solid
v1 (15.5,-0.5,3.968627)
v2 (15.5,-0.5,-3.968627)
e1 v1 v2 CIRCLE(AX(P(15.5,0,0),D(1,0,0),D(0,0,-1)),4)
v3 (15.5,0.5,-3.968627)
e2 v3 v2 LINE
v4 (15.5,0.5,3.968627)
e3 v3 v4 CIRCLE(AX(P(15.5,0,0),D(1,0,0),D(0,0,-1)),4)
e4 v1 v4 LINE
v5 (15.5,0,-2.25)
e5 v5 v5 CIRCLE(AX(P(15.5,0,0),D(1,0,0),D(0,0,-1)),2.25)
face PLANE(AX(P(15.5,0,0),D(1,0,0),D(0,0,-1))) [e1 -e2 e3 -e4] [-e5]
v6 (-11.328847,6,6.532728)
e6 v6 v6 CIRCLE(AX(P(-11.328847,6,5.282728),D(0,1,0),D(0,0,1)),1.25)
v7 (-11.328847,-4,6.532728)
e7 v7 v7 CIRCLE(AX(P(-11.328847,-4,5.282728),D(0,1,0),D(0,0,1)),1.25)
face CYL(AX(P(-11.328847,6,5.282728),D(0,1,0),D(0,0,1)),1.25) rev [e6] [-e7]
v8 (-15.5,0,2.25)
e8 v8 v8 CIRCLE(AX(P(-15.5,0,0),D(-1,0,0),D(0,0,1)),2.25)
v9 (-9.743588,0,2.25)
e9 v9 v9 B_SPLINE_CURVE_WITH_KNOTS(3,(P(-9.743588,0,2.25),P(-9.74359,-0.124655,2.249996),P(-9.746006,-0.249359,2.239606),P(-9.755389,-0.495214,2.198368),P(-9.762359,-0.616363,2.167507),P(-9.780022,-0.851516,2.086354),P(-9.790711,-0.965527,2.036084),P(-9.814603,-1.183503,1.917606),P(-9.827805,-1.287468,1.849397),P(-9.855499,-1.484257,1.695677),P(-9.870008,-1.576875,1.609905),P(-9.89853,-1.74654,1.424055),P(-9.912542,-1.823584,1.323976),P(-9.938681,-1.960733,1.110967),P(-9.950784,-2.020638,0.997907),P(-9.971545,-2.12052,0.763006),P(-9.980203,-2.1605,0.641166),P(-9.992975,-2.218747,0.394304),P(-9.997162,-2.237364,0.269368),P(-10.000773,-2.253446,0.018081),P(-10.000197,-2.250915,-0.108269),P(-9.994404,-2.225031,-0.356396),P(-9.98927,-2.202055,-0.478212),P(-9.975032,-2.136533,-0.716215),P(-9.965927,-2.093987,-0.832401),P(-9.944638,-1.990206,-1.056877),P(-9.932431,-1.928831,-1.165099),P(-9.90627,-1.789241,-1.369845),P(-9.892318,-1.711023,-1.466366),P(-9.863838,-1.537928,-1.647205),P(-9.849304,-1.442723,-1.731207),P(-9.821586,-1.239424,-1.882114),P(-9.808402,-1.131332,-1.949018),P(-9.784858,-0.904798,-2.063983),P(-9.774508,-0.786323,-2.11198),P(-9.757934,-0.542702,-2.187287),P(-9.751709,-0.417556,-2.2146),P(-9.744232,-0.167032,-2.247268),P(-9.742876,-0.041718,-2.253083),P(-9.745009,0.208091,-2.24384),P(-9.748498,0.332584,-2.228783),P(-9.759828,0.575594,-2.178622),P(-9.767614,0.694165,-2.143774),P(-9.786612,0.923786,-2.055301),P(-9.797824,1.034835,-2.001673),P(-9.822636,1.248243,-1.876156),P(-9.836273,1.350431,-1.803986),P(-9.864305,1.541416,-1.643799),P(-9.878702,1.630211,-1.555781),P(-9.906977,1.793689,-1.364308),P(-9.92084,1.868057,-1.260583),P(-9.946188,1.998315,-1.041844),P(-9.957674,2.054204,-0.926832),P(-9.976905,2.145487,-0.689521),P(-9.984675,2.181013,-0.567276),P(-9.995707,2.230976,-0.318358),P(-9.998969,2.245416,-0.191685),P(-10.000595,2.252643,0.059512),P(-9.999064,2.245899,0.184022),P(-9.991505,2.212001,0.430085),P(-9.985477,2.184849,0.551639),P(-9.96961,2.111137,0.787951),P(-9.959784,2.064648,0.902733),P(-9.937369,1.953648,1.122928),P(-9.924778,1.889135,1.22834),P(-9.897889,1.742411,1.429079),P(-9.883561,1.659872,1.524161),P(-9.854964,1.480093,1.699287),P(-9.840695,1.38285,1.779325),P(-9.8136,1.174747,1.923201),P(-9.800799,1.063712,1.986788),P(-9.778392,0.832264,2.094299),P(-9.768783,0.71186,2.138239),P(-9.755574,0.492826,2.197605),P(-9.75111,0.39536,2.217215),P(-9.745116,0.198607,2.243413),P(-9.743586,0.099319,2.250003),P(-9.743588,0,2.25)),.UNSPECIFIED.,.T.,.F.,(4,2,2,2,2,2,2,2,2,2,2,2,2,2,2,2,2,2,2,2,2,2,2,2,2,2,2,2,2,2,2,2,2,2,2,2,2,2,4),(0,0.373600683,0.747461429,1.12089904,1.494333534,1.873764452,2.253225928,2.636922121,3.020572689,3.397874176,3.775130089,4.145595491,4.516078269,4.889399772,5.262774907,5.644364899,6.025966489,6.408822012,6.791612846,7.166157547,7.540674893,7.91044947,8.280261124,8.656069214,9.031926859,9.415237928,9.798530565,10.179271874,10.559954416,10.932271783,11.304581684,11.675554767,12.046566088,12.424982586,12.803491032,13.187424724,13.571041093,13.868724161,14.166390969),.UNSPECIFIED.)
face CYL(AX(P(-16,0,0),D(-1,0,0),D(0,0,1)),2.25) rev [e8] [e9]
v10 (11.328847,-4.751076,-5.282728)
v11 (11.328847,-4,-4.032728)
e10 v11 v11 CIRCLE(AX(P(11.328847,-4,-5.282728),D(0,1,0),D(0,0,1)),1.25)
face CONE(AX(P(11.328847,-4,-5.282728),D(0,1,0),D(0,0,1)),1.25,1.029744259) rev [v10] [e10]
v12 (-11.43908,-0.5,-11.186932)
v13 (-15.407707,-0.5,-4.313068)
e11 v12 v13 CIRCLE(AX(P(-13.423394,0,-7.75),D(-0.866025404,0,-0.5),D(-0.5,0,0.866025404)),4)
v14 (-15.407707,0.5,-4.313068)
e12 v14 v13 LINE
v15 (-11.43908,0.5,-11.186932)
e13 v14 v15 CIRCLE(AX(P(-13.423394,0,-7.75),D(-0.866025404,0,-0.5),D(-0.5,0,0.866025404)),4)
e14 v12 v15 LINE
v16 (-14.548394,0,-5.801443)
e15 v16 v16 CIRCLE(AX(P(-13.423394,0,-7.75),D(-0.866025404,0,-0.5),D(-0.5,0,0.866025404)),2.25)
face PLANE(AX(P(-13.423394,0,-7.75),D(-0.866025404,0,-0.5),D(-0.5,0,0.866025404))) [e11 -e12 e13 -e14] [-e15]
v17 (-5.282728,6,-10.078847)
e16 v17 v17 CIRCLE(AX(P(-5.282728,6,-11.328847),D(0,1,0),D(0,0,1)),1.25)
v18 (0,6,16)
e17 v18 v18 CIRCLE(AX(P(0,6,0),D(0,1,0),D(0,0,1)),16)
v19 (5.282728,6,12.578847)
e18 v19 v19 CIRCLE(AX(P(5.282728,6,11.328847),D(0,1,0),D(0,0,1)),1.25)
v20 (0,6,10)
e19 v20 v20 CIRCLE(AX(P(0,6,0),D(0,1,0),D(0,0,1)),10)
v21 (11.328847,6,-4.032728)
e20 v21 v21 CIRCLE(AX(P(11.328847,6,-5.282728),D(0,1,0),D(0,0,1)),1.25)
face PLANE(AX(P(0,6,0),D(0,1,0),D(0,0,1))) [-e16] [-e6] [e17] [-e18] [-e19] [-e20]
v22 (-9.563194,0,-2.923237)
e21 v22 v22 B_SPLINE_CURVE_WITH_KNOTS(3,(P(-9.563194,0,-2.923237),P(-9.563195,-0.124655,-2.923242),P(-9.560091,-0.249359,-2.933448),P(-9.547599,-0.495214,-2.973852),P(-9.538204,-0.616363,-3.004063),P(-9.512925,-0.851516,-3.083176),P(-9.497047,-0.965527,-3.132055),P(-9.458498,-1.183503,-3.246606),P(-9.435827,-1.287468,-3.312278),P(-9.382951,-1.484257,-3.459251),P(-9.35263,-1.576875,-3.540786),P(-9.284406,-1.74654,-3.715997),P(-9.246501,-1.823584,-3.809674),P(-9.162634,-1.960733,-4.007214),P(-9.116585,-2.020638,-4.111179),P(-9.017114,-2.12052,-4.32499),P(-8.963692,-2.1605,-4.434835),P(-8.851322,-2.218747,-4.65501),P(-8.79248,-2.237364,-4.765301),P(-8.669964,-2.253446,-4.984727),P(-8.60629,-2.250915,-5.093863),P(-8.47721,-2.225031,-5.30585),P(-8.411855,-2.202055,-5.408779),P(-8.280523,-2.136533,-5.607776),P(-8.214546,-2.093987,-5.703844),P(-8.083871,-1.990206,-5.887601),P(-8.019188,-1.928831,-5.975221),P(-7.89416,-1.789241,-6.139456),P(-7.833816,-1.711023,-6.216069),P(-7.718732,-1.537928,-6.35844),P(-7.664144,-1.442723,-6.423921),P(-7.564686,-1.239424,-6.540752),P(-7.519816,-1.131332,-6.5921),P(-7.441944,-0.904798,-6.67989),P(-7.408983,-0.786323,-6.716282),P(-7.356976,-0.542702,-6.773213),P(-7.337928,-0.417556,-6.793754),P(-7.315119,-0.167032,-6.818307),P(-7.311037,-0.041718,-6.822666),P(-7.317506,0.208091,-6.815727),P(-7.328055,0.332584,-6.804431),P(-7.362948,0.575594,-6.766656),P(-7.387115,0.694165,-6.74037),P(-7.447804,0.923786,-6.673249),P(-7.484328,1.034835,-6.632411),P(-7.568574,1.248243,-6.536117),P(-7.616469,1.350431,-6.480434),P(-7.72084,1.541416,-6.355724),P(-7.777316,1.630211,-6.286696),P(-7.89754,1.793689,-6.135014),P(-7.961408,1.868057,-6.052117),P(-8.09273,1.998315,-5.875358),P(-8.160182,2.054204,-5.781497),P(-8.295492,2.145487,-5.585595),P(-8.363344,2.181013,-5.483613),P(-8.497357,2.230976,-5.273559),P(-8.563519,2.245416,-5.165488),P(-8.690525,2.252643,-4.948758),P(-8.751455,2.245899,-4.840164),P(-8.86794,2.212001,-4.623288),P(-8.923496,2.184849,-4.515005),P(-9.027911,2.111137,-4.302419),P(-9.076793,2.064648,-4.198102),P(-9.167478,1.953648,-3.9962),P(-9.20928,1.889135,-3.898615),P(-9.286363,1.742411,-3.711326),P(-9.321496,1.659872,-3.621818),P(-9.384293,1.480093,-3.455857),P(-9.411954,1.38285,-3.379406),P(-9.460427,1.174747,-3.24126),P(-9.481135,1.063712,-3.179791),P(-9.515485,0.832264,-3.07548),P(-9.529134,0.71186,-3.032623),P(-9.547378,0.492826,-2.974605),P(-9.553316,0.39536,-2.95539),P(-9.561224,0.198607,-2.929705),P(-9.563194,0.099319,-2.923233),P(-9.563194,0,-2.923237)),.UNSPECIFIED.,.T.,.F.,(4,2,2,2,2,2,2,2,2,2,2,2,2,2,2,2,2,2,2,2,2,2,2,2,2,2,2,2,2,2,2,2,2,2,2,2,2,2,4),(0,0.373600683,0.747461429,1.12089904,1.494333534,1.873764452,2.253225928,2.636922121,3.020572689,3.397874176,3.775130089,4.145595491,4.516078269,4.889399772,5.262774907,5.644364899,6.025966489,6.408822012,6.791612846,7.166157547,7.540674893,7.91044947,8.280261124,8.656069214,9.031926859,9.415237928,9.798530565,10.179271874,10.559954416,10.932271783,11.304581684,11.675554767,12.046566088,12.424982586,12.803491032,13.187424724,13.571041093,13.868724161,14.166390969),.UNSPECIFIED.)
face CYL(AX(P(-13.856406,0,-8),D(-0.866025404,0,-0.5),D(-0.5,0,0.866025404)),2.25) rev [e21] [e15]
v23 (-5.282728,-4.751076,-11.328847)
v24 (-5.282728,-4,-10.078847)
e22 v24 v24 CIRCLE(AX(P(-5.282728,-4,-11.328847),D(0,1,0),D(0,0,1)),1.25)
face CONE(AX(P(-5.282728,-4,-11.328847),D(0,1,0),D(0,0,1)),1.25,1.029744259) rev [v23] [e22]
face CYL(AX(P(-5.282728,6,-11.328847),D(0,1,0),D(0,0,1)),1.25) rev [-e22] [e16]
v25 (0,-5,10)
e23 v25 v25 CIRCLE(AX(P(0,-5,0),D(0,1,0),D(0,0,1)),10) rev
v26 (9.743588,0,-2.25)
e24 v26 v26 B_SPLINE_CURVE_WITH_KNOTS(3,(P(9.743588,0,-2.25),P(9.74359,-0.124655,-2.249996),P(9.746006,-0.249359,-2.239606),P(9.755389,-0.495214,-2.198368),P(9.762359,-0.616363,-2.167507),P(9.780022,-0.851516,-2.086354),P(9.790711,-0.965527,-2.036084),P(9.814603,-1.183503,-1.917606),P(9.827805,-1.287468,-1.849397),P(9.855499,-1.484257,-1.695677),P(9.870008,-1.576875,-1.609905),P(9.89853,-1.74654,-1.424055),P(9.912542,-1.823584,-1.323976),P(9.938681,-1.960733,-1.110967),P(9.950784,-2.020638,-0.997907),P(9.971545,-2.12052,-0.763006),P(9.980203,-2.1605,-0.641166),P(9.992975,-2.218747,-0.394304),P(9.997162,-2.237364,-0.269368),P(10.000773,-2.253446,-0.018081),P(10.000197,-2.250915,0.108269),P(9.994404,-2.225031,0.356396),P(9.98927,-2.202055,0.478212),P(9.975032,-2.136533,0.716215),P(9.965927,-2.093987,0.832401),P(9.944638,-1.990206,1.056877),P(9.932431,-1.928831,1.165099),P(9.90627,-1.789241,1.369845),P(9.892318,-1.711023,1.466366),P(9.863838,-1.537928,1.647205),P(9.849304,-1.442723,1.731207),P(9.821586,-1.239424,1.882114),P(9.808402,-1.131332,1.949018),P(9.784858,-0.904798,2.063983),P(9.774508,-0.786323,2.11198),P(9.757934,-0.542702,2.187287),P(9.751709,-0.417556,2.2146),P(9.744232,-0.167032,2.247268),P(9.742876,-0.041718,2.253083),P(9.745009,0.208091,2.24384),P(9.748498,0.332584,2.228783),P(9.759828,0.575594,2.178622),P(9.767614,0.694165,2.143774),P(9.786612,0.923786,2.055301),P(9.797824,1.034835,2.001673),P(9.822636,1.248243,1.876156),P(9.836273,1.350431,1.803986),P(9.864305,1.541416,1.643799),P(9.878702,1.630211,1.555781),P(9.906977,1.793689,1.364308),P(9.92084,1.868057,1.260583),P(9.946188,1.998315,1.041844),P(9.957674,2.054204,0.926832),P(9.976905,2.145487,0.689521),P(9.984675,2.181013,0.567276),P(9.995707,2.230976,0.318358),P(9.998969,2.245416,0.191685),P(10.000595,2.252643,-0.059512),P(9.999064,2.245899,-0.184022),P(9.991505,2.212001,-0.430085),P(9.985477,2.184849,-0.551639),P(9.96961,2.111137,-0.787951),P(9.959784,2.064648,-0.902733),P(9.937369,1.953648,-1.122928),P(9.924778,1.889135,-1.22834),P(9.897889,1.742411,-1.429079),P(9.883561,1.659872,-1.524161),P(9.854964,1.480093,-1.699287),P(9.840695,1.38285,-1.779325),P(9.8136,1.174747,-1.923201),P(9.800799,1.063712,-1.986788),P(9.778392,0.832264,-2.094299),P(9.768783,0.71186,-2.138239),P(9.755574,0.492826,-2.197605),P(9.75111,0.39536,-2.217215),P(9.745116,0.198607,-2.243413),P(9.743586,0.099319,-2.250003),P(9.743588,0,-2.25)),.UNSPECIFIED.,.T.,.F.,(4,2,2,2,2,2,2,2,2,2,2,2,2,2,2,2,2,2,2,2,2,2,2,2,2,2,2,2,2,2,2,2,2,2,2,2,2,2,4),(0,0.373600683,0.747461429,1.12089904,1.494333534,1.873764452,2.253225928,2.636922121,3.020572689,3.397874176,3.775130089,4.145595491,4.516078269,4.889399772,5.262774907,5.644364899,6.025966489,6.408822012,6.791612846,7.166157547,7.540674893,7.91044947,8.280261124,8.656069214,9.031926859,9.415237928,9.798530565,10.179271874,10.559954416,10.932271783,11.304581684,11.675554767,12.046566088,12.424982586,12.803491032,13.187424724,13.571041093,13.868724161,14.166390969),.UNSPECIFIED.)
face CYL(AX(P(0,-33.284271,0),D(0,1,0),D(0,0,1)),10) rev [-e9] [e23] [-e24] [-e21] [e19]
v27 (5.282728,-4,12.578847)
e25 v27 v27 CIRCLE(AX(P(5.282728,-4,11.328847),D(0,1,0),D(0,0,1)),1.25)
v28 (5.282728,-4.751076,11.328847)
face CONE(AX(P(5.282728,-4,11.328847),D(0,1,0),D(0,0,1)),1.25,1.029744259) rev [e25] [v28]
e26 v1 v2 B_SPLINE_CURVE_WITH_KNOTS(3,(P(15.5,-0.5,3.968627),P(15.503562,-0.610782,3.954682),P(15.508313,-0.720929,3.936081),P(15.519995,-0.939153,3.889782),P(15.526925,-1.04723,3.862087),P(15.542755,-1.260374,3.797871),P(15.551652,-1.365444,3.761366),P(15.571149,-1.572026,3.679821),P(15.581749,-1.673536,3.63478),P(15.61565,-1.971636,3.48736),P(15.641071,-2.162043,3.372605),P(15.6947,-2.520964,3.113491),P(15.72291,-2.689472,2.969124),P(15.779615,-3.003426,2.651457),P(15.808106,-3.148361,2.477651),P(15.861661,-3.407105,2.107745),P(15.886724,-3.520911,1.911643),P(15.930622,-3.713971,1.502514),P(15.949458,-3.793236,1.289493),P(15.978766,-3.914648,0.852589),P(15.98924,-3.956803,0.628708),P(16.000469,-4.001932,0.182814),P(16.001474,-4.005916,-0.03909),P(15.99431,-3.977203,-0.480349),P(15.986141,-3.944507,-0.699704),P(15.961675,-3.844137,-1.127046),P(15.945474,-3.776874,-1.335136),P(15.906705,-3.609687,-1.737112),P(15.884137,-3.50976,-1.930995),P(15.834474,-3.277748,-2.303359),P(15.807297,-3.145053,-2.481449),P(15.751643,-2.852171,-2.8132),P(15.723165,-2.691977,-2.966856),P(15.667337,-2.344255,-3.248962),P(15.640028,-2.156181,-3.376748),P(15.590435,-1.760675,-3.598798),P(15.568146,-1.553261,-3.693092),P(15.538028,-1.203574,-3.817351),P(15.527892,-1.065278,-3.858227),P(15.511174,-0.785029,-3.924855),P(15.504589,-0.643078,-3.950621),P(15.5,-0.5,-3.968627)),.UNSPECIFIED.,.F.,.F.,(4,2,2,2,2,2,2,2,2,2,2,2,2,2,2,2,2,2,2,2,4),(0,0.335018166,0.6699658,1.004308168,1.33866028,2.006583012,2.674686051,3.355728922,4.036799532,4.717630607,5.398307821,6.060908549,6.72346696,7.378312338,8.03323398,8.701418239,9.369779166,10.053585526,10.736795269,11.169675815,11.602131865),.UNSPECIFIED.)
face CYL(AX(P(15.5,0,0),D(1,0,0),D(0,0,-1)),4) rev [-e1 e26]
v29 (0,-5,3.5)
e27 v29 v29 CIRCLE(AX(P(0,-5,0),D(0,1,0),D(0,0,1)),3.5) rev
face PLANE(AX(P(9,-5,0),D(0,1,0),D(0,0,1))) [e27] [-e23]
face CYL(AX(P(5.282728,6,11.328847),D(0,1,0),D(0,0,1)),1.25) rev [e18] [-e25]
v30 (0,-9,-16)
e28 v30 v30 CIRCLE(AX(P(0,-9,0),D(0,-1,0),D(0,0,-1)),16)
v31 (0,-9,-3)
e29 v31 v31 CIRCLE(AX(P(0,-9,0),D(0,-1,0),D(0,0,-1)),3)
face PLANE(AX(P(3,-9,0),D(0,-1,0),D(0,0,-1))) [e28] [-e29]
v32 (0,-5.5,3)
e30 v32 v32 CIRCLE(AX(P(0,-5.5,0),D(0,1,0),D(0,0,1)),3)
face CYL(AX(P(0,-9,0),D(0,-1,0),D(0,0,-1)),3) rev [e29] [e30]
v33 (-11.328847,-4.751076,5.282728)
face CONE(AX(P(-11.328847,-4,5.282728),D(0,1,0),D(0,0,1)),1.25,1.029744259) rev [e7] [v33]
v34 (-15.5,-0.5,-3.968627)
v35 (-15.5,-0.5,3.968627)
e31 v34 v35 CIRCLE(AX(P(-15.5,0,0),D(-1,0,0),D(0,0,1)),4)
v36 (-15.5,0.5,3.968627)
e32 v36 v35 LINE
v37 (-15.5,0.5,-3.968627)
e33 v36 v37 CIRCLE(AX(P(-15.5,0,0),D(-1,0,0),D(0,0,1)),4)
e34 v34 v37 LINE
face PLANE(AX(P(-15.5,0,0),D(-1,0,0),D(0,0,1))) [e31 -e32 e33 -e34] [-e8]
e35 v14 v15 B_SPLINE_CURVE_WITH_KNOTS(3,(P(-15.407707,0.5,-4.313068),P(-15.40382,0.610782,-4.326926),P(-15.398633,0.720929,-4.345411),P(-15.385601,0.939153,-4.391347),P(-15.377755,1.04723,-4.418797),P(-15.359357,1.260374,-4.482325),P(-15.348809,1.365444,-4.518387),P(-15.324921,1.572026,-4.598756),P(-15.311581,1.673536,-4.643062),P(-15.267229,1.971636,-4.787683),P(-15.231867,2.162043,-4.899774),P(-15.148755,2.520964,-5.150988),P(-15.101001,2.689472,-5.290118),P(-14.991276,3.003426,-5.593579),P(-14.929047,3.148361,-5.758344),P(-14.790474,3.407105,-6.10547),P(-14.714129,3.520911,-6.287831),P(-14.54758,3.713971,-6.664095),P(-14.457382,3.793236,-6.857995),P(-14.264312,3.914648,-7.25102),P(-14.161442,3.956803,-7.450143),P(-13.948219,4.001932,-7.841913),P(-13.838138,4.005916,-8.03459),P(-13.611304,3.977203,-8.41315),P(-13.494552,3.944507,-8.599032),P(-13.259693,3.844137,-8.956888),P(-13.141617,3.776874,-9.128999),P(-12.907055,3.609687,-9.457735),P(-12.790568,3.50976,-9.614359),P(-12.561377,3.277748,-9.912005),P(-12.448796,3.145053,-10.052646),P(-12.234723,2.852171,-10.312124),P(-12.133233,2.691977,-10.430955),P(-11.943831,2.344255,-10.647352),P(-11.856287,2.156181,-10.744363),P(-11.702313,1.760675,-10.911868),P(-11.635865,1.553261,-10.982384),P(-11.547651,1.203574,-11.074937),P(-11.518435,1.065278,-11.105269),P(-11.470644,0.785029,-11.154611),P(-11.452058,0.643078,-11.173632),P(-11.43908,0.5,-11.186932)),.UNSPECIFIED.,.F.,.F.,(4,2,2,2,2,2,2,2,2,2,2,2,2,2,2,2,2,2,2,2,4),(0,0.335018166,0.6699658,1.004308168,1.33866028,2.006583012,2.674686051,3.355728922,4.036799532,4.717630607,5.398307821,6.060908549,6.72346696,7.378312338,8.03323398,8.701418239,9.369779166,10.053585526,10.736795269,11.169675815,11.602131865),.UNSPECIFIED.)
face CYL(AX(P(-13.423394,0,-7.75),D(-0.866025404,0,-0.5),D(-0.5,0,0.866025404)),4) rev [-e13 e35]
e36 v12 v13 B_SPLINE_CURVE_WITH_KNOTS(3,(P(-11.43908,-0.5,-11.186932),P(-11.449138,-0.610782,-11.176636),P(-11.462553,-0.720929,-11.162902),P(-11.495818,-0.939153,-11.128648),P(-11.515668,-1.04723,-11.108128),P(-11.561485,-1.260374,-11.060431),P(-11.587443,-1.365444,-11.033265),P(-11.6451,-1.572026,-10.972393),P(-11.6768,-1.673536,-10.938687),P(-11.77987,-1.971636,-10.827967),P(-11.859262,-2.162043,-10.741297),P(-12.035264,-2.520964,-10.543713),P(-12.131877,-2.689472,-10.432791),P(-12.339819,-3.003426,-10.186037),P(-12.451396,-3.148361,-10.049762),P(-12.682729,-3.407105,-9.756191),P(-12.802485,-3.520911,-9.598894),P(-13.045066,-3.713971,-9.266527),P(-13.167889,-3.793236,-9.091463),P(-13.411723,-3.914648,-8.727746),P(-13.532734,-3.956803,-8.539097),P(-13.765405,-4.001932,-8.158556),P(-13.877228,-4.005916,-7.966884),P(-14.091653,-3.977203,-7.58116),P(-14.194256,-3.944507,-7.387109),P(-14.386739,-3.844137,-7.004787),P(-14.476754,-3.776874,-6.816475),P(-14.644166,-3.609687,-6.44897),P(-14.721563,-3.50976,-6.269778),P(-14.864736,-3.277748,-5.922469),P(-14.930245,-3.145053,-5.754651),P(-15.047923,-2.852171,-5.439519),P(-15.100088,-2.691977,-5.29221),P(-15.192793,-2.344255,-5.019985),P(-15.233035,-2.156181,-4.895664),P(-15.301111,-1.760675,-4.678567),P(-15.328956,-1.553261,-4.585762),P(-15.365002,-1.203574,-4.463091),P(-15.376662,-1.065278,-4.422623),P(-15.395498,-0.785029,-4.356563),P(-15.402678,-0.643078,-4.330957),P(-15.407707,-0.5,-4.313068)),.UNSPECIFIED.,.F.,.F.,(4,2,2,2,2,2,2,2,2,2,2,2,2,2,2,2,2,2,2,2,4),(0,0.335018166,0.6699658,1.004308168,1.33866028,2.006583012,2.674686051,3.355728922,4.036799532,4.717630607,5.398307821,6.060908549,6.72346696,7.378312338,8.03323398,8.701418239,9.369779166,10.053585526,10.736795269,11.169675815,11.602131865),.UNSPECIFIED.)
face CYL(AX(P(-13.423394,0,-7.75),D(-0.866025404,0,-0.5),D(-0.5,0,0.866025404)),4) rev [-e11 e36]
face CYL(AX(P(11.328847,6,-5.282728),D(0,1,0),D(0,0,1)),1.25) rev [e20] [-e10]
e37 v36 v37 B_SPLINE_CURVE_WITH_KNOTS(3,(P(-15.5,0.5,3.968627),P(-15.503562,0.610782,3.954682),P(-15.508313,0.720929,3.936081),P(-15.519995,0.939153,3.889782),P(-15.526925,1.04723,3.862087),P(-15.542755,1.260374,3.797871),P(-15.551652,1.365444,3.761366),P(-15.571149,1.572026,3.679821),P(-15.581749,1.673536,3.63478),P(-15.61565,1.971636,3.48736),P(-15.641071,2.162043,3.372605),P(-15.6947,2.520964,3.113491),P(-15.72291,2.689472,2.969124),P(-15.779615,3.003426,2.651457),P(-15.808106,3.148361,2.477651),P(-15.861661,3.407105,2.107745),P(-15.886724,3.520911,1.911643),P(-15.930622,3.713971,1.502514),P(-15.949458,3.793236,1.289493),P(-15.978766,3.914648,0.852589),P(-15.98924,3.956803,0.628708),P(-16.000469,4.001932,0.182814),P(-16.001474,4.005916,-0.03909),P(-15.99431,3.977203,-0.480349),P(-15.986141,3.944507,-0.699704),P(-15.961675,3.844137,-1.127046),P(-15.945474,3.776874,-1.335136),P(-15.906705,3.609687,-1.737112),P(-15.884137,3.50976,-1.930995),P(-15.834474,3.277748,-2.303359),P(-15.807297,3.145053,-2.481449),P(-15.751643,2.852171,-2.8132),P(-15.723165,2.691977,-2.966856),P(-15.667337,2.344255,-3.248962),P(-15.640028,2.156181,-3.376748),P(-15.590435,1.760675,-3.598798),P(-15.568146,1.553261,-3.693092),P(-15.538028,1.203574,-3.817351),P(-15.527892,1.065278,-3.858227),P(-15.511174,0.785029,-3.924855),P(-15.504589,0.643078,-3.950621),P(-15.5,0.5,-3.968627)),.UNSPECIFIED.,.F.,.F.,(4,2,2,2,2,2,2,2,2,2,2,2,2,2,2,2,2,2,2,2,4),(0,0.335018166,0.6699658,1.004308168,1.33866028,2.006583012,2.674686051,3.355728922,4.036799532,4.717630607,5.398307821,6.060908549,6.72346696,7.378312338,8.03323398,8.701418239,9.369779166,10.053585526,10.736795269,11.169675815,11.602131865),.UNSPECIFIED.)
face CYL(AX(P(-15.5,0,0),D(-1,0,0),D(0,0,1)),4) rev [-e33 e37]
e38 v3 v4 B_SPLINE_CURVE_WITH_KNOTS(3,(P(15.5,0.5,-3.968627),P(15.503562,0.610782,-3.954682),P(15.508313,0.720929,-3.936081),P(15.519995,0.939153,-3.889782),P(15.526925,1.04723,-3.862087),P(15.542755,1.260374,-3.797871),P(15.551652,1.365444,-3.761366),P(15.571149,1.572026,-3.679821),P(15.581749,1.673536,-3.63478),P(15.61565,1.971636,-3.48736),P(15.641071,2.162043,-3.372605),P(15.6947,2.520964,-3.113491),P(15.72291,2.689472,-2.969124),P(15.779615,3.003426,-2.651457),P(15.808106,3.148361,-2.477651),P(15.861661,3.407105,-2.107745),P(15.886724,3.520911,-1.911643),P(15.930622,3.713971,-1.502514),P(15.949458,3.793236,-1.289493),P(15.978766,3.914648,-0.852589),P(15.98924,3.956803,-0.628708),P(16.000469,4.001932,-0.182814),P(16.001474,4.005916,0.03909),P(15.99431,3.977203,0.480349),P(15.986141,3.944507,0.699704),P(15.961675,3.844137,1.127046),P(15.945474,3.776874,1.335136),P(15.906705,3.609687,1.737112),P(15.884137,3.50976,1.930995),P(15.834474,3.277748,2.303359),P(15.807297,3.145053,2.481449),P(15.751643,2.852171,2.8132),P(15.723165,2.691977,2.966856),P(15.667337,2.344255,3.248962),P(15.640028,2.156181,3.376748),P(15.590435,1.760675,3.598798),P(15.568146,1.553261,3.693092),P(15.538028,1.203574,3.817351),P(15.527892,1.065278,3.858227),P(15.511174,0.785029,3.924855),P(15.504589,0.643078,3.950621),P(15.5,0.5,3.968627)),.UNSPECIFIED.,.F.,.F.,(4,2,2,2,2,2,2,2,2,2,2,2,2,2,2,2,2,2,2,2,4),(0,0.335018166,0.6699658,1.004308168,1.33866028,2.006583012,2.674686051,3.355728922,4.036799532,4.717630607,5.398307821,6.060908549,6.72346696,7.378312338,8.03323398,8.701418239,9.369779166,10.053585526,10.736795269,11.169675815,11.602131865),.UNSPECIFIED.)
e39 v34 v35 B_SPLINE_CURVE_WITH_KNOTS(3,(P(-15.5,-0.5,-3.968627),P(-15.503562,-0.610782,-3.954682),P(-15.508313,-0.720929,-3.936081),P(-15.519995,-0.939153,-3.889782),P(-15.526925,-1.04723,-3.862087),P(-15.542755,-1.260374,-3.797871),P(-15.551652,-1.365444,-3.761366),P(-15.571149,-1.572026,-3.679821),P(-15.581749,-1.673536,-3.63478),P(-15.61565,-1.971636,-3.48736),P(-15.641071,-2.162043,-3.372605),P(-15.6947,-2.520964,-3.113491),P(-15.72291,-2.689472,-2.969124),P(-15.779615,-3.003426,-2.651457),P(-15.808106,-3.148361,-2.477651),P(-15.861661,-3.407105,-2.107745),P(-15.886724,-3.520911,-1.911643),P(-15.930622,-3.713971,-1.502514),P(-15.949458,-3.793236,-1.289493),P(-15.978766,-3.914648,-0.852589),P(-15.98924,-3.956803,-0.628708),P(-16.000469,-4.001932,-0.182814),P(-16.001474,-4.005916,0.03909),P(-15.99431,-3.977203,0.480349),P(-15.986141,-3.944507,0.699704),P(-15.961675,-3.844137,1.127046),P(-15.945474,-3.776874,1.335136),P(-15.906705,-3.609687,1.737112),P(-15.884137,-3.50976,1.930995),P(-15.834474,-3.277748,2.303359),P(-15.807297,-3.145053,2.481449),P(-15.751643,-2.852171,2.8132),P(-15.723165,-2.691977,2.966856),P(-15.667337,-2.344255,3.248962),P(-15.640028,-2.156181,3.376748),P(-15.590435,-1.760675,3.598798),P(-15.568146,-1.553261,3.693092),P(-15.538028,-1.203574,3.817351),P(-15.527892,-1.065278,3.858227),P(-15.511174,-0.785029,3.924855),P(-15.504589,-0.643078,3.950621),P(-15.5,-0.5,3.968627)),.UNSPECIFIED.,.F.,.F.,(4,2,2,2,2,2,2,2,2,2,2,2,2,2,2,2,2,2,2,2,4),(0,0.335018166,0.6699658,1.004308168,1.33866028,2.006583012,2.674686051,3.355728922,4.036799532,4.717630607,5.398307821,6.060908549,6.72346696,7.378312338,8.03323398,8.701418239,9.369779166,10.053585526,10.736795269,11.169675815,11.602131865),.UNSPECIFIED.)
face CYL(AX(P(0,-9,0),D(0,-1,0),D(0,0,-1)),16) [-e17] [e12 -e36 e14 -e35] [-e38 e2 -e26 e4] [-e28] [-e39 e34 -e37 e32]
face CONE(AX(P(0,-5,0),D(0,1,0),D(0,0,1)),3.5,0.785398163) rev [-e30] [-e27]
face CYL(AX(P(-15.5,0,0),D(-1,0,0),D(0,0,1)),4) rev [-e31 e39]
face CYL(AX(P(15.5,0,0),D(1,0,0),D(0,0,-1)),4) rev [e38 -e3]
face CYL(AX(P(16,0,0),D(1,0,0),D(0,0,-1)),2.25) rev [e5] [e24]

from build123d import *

# Parameters (mm, degrees)
ESBO_O4_W                        = 2.25
ESBO_O4_H                        = 16
F_4_5_4_5_DIAMETER_HOLE2_D       = 4.5
F_4_5_4_5_DIAMETER_HOLE2_DEPTH   = 18
F_4_5_4_5_DIAMETER_HOLE2_TIP     = 1.351936393
ESBO_O12_R                       = 16
ESBO_O12_R_2                     = 9
RESSALTO_EXTRUS_O1_DEPTH         = 1
CHANFRO1_SIZE                    = 0.5
CHANFRO2_SIZE                    = 0.25
FURO_DE_DI_METRO_4_5_4_5_2_D     = 4.5
FURO_DE_DI_METRO_4_5_4_5_2_DEPTH = 8
FURO_DE_DI_METRO_4_5_4_5_2_TIP   = 1.351936393
CORTE_EXTRUS_O4_START            = -0.5
ESBO_O18_R                       = 4
ESBO_O18_R_2                     = 2.25
CORTE_EXTRUS_O4_DEPTH            = 0.5
PADR_OCIRCULAR6_COUNT            = 2
PADR_OCIRCULAR6_ANGLE            = 30
PADR_OCIRCULAR7_COUNT            = 2
PADR_OCIRCULAR7_ANGLE            = 210
REBAIXO_INSERTO_REACH            = 29.148
ESBO_O20_R                       = 10


# Read off the part's stored shape, not the designer's step: PadrãoCircular5
with BuildPart() as part:
    # Esboço1 → Revolução1 (revolve)
    with BuildSketch(Plane.XY, mode=Mode.PRIVATE) as revolu_o1_sk:
        Polygon((3, -9), (16, -9), (16, 5), (9, 5), (9, -5), (3, -5), align=None)
    revolve(revolu_o1_sk.sketch.rotate(Axis((0, -9, 0), (0, 1, 0)), 90), axis=Axis((0, -9, 0), (0, 1, 0)))

    # Esboço4 → Furo de diâmetro Ø4.5 (4.5)1 (revolve, cut)
    with BuildSketch(Plane(origin=(16, 0, 0), x_dir=(0, 0, -1), z_dir=(0, 1, 0))):
        with Locations((1.125, 8)):
            Rectangle(ESBO_O4_W, ESBO_O4_H)
    revolve(axis=Axis((22.35, 0, 0), (-1, 0, 0)), mode=Mode.SUBTRACT)

    # Ø4.5 (4.5) Diameter Hole2
    with Locations(Plane(origin=(-13.856406461, 0, -8), x_dir=(0, -1, 0), z_dir=(-0.8660254037844364, 0, -0.5000000000000041))):
        with Locations((0, 0)):
            Hole(F_4_5_4_5_DIAMETER_HOLE2_D / 2, depth=F_4_5_4_5_DIAMETER_HOLE2_DEPTH)
            with Locations((0, 0, -(F_4_5_4_5_DIAMETER_HOLE2_DEPTH + F_4_5_4_5_DIAMETER_HOLE2_TIP / 2))):  # 118° drill point
                Cone(0, F_4_5_4_5_DIAMETER_HOLE2_D / 2, F_4_5_4_5_DIAMETER_HOLE2_TIP, mode=Mode.SUBTRACT)

    # Esboço12 → Ressalto-extrusão1 (add)
    with BuildSketch(Plane(origin=(0, 5, 0), x_dir=(1, 0, 0), z_dir=(0, 1, 0))):
        with Locations(Location((0, 0, 0), (0, 0, 90))):
            Circle(ESBO_O12_R)
        with Locations(Location((0, 0, 0), (0, 0, 90))):
            Circle(ESBO_O12_R_2, mode=Mode.SUBTRACT)
    extrude(amount=RESSALTO_EXTRUS_O1_DEPTH)

    # Esboço13 → Furo roscado de M3x0.51 (revolve, cut)
    with BuildSketch(Plane(origin=(11.328847338, 6, -5.282728272), x_dir=(0, 0, 1), z_dir=(1, 0, 0))):
        Polygon((0, 0), (0, 10.751075774), (1.25, 10), (1.25, 0), align=None)
    revolve(axis=Axis((11.328847338, 12.35, -5.282728272), (0, -1, 0)), mode=Mode.SUBTRACT)

    # PadrãoCircular5 outline → PadrãoCircular5 (revolve, cut)
    with BuildSketch(Plane(origin=(5.282728272, 0, 11.328847338), x_dir=(1, 0, 0), z_dir=(0, 0, 1))):
        Polygon((0, 6), (0, -4.751075774), (1.25, -4), (1.25, 6), align=None)
    revolve(axis=Axis((5.282728272, 0, 11.328847338), (0, 1, 0)), mode=Mode.SUBTRACT)

    # Padr_oCircular5 2 outline → Padr_oCircular5 2 (revolve, cut)
    with BuildSketch(Plane(origin=(-11.328847338, 0, 5.282728272), x_dir=(1, 0, 0), z_dir=(0, 0, 1))):
        Polygon((0, 6), (0, -4.751075774), (1.25, -4), (1.25, 6), align=None)
    revolve(axis=Axis((-11.328847338, 0, 5.282728272), (0, 1, 0)), mode=Mode.SUBTRACT)

    # Padr_oCircular5 3 outline → Padr_oCircular5 3 (revolve, cut)
    with BuildSketch(Plane(origin=(-5.282728272, 0, -11.328847338), x_dir=(1, 0, 0), z_dir=(0, 0, 1))):
        Polygon((0, 6), (0, -4.751075774), (1.25, -4), (1.25, 6), align=None)
    revolve(axis=Axis((-5.282728272, 0, -11.328847338), (0, 1, 0)), mode=Mode.SUBTRACT)

    # Chanfro1
    chanfro1_edges = [part.edges().sort_by_distance(p)[0] for p in [
        (0, -5, 3),
    ]]
    chamfer(chanfro1_edges, length=CHANFRO1_SIZE)

    # Chanfro2
    chanfro2_edges = [part.edges().sort_by_distance(p)[0] for p in [
        (0, 6, 9),
    ]]
    chamfer(chanfro2_edges, length=CHANFRO2_SIZE)

    # Furo de diâmetro Ø4.5 (4.5)2
    with Locations(Plane(origin=(-16, 0, 0), x_dir=(0, 0, -1), z_dir=(-1, 0, 0))):
        with Locations((0, 0)):
            Hole(FURO_DE_DI_METRO_4_5_4_5_2_D / 2, depth=FURO_DE_DI_METRO_4_5_4_5_2_DEPTH)
            with Locations((0, 0, -(FURO_DE_DI_METRO_4_5_4_5_2_DEPTH + FURO_DE_DI_METRO_4_5_4_5_2_TIP / 2))):  # 118° drill point
                Cone(0, FURO_DE_DI_METRO_4_5_4_5_2_D / 2, FURO_DE_DI_METRO_4_5_4_5_2_TIP, mode=Mode.SUBTRACT)

    # Esboço18 → Corte-extrusão4 (cut)
    with BuildSketch(Plane(origin=(-13.856406461, 0, -8), x_dir=(0, -1, 0), z_dir=(-0.8660254037844364, 0, -0.5000000000000041)).offset(CORTE_EXTRUS_O4_START)):
        Circle(ESBO_O18_R)
        with Locations(Location((0, 0, 0), (0, 0, 90))):
            Circle(ESBO_O18_R_2, mode=Mode.SUBTRACT)
    corte_extrus_o4 = extrude(amount=CORTE_EXTRUS_O4_DEPTH, mode=Mode.SUBTRACT)

    # PadrãoCircular6: Corte-extrusão4 ×2 about axis
    padr_ocircular6_axis = Axis((0, -9.75, 0), (0, 1, 0))
    for i in range(1, PADR_OCIRCULAR6_COUNT):
        add(corte_extrus_o4.rotate(padr_ocircular6_axis, i * PADR_OCIRCULAR6_ANGLE / (PADR_OCIRCULAR6_COUNT - 1)), mode=Mode.SUBTRACT)

    # PadrãoCircular7: Corte-extrusão4 ×2 about axis
    padr_ocircular7_axis = Axis((0, -9.75, 0), (0, 1, 0))
    for i in range(1, PADR_OCIRCULAR7_COUNT):
        add(corte_extrus_o4.rotate(padr_ocircular7_axis, i * PADR_OCIRCULAR7_ANGLE / (PADR_OCIRCULAR7_COUNT - 1)), mode=Mode.SUBTRACT)

    # Rebaixo_Inserto: up to this face of the body (flat: up to its plane)
    rebaixo_inserto_end = Plane(part.part.faces().sort_by_distance((0, -5, 3.754558441))[0])
    # Esboço20 → Rebaixo_Inserto (cut, up to the picked face)
    with BuildSketch(Plane(origin=(0, 6, 0), x_dir=(1, 0, 0), z_dir=(0, 1, 0)), mode=Mode.PRIVATE) as rebaixo_inserto_sk1:
        with Locations(Location((0, 0, 0), (0, 0, 270))):
            Circle(ESBO_O20_R)
    rebaixo_inserto_tool1 = split(extrude(rebaixo_inserto_sk1.sketch, amount=-REBAIXO_INSERTO_REACH, mode=Mode.PRIVATE), bisect_by=rebaixo_inserto_end, keep=Keep.BOTH, mode=Mode.PRIVATE)
    add(rebaixo_inserto_tool1.solids().sort_by(Axis((0, 6, 0), (0, -1, 0)))[0], mode=Mode.SUBTRACT)


solid = part.part
